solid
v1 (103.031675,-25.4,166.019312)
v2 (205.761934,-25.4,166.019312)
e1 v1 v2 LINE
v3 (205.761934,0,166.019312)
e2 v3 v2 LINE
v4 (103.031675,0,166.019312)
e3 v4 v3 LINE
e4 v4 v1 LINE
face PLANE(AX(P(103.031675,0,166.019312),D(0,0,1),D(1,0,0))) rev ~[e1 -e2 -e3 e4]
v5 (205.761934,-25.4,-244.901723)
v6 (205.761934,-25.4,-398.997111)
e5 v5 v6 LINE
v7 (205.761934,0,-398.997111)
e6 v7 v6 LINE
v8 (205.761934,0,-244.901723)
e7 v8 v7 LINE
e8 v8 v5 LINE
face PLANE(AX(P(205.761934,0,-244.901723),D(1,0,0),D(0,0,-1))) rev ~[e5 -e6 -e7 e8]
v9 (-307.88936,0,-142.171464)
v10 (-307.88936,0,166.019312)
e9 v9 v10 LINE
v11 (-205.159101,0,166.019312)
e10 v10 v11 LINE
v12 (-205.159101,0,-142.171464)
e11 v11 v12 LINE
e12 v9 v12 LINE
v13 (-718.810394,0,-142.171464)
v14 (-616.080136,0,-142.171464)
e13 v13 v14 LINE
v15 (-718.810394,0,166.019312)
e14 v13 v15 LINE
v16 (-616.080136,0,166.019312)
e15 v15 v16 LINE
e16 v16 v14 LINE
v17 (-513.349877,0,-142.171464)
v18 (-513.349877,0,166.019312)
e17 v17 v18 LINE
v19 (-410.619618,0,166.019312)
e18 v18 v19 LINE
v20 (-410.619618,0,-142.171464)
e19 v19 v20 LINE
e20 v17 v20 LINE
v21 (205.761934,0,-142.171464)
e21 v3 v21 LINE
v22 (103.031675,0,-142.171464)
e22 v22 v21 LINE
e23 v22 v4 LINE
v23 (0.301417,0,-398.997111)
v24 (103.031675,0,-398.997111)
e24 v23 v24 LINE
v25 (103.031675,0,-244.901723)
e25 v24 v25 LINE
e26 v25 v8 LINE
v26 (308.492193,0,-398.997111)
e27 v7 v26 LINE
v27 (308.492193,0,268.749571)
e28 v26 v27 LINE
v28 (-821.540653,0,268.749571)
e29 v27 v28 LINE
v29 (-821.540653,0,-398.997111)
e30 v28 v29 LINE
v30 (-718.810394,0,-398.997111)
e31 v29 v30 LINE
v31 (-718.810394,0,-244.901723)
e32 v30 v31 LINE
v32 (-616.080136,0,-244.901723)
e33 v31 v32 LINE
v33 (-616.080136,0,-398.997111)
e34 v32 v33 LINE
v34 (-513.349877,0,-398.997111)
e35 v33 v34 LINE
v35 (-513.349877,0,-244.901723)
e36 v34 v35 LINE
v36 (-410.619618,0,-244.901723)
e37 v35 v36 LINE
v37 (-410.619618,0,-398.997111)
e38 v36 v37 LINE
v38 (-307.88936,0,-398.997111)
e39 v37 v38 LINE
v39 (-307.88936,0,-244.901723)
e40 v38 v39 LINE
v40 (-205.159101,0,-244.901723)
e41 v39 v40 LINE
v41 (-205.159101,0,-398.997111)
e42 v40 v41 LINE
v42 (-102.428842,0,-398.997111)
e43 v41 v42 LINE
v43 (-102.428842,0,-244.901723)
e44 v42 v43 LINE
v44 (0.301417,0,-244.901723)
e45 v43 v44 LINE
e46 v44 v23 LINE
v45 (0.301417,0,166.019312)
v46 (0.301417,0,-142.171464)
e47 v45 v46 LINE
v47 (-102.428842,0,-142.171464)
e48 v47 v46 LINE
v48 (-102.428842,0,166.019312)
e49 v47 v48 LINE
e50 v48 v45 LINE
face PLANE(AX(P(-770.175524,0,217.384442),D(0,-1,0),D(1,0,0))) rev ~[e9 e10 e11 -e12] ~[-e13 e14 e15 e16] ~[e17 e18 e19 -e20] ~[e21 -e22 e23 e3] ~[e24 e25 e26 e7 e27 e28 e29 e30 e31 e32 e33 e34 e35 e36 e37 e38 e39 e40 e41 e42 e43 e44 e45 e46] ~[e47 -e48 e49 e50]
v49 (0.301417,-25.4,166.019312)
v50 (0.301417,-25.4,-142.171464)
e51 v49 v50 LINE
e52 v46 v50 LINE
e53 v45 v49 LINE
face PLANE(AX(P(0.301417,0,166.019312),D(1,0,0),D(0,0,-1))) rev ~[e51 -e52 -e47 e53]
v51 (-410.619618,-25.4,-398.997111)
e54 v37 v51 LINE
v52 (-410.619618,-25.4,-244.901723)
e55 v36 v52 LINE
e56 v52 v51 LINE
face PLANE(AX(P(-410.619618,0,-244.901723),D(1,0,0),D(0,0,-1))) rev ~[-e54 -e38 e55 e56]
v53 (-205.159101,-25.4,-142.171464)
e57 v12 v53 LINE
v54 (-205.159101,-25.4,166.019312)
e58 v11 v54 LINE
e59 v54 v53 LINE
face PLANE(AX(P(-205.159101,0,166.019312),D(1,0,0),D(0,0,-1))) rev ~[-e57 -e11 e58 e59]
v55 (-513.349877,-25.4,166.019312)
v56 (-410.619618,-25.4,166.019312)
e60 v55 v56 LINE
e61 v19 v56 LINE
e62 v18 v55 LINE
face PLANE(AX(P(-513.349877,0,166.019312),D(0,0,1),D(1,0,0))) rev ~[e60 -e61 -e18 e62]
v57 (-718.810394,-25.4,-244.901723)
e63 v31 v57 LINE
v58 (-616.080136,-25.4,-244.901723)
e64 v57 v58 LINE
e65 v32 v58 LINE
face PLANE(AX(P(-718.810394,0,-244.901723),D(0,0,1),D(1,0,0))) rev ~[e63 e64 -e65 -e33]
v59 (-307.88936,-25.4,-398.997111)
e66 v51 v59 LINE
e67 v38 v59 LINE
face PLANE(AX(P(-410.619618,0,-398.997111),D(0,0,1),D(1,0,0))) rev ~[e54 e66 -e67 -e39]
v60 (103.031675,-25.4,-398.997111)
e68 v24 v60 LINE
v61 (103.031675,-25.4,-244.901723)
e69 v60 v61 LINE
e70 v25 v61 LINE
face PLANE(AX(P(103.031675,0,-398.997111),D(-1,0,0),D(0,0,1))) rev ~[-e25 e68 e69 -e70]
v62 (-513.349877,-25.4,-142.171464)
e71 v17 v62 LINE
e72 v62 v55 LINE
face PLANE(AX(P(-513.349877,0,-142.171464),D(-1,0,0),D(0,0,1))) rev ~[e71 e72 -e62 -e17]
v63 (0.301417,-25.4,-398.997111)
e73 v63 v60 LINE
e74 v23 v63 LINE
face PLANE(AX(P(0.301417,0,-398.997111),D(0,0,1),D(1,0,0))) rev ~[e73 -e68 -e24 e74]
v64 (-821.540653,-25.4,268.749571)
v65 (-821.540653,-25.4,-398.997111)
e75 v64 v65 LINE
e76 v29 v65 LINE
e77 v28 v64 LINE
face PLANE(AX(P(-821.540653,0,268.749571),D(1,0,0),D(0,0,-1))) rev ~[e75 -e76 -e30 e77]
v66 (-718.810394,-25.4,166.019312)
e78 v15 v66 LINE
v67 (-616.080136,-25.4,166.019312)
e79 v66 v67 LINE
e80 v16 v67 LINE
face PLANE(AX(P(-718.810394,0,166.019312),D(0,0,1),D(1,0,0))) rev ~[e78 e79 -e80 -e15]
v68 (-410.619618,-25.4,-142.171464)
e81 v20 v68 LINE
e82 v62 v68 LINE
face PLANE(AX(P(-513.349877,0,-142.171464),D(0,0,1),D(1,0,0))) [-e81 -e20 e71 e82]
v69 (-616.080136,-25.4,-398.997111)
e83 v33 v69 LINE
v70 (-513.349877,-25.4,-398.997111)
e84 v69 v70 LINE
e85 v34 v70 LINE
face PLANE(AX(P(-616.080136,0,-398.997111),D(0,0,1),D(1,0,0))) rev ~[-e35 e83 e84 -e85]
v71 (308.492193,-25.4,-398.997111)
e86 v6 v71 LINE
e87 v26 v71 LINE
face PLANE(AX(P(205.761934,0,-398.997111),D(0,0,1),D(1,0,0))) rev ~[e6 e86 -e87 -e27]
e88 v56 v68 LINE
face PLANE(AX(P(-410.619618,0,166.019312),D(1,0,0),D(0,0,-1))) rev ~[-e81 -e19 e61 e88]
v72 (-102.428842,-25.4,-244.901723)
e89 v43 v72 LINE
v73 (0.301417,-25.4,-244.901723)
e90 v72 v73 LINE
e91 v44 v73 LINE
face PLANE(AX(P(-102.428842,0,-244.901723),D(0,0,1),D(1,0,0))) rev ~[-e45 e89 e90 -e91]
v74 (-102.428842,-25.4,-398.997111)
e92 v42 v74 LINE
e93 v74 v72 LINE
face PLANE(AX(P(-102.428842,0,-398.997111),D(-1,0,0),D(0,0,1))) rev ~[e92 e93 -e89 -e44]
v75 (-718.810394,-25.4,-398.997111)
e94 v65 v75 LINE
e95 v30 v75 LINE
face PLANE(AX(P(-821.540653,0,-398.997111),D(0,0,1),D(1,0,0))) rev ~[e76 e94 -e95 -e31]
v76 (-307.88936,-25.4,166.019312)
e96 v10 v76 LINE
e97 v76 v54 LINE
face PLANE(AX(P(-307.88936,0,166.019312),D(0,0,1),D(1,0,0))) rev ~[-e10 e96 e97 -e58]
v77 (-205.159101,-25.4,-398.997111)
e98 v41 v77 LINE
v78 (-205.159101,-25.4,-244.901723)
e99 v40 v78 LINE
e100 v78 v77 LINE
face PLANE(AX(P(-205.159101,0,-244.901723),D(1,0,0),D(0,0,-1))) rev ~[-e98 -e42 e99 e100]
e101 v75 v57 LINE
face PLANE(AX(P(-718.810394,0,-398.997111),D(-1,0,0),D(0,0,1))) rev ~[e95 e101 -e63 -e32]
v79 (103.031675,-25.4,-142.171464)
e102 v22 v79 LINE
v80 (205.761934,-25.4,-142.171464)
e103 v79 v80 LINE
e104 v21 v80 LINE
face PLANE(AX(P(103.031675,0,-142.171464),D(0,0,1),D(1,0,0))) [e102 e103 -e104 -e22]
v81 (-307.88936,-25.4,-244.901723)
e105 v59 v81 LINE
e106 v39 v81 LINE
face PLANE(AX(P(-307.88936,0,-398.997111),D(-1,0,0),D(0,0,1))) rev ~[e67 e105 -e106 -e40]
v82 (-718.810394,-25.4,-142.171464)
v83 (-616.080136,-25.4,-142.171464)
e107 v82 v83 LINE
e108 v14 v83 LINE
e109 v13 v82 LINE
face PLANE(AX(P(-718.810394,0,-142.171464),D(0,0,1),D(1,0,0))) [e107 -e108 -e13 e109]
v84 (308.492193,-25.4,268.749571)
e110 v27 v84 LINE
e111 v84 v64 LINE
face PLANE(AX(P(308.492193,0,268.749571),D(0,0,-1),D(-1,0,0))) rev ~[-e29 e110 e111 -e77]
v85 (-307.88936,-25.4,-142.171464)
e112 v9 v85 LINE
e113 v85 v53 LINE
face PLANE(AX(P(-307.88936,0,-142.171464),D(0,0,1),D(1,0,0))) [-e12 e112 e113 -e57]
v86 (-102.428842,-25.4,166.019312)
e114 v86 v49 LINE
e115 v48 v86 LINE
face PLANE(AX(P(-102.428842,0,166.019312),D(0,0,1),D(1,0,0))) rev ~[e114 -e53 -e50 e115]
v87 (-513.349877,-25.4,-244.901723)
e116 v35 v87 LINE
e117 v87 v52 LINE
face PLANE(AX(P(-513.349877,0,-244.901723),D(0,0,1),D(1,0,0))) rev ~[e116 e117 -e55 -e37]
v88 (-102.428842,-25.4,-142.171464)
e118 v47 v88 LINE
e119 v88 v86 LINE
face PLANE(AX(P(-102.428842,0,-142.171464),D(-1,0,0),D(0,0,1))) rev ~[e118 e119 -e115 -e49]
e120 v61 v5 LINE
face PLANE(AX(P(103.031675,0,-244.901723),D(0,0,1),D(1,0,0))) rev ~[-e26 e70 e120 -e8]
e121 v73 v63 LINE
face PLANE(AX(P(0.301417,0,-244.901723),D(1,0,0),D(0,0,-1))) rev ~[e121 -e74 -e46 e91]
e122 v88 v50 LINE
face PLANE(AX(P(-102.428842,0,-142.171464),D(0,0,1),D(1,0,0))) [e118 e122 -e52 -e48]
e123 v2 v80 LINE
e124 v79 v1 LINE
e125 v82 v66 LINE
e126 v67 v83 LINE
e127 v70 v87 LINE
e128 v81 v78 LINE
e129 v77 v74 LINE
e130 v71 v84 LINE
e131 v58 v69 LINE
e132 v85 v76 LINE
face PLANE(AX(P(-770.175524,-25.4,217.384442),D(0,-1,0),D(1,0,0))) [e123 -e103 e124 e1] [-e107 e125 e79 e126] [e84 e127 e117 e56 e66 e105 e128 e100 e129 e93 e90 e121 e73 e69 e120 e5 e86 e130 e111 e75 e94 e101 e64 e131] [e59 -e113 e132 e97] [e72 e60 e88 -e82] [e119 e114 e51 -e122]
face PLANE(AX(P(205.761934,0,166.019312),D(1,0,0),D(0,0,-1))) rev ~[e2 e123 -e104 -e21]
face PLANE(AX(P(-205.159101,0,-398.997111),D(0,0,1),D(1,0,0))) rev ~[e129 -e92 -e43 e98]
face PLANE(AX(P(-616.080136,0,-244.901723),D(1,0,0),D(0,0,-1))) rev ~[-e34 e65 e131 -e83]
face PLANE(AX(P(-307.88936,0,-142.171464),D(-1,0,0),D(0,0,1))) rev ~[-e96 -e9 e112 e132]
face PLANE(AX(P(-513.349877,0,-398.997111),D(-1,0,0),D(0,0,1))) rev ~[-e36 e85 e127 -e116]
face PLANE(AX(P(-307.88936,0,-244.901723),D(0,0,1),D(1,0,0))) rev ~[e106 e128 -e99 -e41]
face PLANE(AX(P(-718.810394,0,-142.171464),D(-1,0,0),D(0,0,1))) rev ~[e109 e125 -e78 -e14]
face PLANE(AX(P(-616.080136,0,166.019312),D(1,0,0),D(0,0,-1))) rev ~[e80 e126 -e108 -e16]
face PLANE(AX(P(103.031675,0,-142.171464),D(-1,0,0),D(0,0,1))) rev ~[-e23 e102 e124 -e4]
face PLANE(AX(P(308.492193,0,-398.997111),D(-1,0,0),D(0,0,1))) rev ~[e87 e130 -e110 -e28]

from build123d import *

# Parameters (mm, degrees)
F0_W     = 102.730258709
F0_H     = 102.730258709
F0_H_2   = 308.1907761271
F0_H_3   = 154.0953880636
F1_DEPTH = 25.4


# Not quite as in the source:
# - a feature names something its author has since deleted; it is built from what else it names


with BuildPart() as f1:
    # F0 (on Front) → F1 (new body)
    with BuildSketch(Plane.XZ):
        with Locations((-770.1755237305, 217.3844415066)):
            Rectangle(F0_W, F0_H)
        with Locations((-770.1755237305, 11.9239240885)):
            Rectangle(F0_W, F0_H_2)
        with Locations((-770.1755237305, -193.5365933296)):
            Rectangle(F0_W, F0_H)
        with Locations((-770.1755237305, -321.9494167159)):
            Rectangle(F0_W, F0_H_3)
        with Locations((-564.7150063124, -193.5365933296)):
            Rectangle(F0_W, F0_H)
        with Locations((-564.7150063124, 11.9239240885)):
            Rectangle(F0_W, F0_H_2)
        with Locations((-564.7150063124, 217.3844415066)):
            Rectangle(F0_W, F0_H)
        with Locations((-359.2544888943, 217.3844415066)):
            Rectangle(F0_W, F0_H)
        with Locations((-359.2544888943, 11.9239240885)):
            Rectangle(F0_W, F0_H_2)
        with Locations((-359.2544888943, -321.9494167159)):
            Rectangle(F0_W, F0_H_3)
        with Locations((-564.7150063124, -321.9494167159)):
            Rectangle(F0_W, F0_H_3)
        with Locations((-359.2544888943, -193.5365933296)):
            Rectangle(F0_W, F0_H)
        with Locations((-153.7939714763, -193.5365933296)):
            Rectangle(F0_W, F0_H)
        with Locations((-153.7939714763, 217.3844415066)):
            Rectangle(F0_W, F0_H)
        with Locations((-153.7939714763, -321.9494167159)):
            Rectangle(F0_W, F0_H_3)
        with Locations((51.6665459418, -321.9494167159)):
            Rectangle(F0_W, F0_H_3)
        with Locations((51.6665459418, -193.5365933296)):
            Rectangle(F0_W, F0_H)
        with Locations((51.6665459418, 11.9239240885)):
            Rectangle(F0_W, F0_H_2)
        with Locations((-153.7939714763, 11.9239240885)):
            Rectangle(F0_W, F0_H_2)
        with Locations((51.6665459418, 217.3844415066)):
            Rectangle(F0_W, F0_H)
        with Locations((257.1270633599, 217.3844415066)):
            Rectangle(F0_W, F0_H)
        with Locations((257.1270633599, 11.9239240885)):
            Rectangle(F0_W, F0_H_2)
        with Locations((257.1270633599, -193.5365933296)):
            Rectangle(F0_W, F0_H)
        with Locations((257.1270633599, -321.9494167159)):
            Rectangle(F0_W, F0_H_3)
        with Locations((-667.4452650214, 217.3844415066)):
            Rectangle(F0_W, F0_H)
        with Locations((-667.4452650214, -193.5365933296)):
            Rectangle(F0_W, F0_H)
        with Locations((-461.9847476034, -193.5365933296)):
            Rectangle(F0_W, F0_H)
        with Locations((-461.9847476034, 217.3844415066)):
            Rectangle(F0_W, F0_H)
        with Locations((-256.5242301853, 217.3844415066)):
            Rectangle(F0_W, F0_H)
        with Locations((-256.5242301853, -193.5365933296)):
            Rectangle(F0_W, F0_H)
        with Locations((-51.0637127672, -193.5365933296)):
            Rectangle(F0_W, F0_H)
        with Locations((-51.0637127672, 217.3844415066)):
            Rectangle(F0_W, F0_H)
        with Locations((154.3968046508, 217.3844415066)):
            Rectangle(F0_W, F0_H)
        with Locations((154.3968046508, -193.5365933296)):
            Rectangle(F0_W, F0_H)
    extrude(amount=F1_DEPTH)


solid = f1.part
